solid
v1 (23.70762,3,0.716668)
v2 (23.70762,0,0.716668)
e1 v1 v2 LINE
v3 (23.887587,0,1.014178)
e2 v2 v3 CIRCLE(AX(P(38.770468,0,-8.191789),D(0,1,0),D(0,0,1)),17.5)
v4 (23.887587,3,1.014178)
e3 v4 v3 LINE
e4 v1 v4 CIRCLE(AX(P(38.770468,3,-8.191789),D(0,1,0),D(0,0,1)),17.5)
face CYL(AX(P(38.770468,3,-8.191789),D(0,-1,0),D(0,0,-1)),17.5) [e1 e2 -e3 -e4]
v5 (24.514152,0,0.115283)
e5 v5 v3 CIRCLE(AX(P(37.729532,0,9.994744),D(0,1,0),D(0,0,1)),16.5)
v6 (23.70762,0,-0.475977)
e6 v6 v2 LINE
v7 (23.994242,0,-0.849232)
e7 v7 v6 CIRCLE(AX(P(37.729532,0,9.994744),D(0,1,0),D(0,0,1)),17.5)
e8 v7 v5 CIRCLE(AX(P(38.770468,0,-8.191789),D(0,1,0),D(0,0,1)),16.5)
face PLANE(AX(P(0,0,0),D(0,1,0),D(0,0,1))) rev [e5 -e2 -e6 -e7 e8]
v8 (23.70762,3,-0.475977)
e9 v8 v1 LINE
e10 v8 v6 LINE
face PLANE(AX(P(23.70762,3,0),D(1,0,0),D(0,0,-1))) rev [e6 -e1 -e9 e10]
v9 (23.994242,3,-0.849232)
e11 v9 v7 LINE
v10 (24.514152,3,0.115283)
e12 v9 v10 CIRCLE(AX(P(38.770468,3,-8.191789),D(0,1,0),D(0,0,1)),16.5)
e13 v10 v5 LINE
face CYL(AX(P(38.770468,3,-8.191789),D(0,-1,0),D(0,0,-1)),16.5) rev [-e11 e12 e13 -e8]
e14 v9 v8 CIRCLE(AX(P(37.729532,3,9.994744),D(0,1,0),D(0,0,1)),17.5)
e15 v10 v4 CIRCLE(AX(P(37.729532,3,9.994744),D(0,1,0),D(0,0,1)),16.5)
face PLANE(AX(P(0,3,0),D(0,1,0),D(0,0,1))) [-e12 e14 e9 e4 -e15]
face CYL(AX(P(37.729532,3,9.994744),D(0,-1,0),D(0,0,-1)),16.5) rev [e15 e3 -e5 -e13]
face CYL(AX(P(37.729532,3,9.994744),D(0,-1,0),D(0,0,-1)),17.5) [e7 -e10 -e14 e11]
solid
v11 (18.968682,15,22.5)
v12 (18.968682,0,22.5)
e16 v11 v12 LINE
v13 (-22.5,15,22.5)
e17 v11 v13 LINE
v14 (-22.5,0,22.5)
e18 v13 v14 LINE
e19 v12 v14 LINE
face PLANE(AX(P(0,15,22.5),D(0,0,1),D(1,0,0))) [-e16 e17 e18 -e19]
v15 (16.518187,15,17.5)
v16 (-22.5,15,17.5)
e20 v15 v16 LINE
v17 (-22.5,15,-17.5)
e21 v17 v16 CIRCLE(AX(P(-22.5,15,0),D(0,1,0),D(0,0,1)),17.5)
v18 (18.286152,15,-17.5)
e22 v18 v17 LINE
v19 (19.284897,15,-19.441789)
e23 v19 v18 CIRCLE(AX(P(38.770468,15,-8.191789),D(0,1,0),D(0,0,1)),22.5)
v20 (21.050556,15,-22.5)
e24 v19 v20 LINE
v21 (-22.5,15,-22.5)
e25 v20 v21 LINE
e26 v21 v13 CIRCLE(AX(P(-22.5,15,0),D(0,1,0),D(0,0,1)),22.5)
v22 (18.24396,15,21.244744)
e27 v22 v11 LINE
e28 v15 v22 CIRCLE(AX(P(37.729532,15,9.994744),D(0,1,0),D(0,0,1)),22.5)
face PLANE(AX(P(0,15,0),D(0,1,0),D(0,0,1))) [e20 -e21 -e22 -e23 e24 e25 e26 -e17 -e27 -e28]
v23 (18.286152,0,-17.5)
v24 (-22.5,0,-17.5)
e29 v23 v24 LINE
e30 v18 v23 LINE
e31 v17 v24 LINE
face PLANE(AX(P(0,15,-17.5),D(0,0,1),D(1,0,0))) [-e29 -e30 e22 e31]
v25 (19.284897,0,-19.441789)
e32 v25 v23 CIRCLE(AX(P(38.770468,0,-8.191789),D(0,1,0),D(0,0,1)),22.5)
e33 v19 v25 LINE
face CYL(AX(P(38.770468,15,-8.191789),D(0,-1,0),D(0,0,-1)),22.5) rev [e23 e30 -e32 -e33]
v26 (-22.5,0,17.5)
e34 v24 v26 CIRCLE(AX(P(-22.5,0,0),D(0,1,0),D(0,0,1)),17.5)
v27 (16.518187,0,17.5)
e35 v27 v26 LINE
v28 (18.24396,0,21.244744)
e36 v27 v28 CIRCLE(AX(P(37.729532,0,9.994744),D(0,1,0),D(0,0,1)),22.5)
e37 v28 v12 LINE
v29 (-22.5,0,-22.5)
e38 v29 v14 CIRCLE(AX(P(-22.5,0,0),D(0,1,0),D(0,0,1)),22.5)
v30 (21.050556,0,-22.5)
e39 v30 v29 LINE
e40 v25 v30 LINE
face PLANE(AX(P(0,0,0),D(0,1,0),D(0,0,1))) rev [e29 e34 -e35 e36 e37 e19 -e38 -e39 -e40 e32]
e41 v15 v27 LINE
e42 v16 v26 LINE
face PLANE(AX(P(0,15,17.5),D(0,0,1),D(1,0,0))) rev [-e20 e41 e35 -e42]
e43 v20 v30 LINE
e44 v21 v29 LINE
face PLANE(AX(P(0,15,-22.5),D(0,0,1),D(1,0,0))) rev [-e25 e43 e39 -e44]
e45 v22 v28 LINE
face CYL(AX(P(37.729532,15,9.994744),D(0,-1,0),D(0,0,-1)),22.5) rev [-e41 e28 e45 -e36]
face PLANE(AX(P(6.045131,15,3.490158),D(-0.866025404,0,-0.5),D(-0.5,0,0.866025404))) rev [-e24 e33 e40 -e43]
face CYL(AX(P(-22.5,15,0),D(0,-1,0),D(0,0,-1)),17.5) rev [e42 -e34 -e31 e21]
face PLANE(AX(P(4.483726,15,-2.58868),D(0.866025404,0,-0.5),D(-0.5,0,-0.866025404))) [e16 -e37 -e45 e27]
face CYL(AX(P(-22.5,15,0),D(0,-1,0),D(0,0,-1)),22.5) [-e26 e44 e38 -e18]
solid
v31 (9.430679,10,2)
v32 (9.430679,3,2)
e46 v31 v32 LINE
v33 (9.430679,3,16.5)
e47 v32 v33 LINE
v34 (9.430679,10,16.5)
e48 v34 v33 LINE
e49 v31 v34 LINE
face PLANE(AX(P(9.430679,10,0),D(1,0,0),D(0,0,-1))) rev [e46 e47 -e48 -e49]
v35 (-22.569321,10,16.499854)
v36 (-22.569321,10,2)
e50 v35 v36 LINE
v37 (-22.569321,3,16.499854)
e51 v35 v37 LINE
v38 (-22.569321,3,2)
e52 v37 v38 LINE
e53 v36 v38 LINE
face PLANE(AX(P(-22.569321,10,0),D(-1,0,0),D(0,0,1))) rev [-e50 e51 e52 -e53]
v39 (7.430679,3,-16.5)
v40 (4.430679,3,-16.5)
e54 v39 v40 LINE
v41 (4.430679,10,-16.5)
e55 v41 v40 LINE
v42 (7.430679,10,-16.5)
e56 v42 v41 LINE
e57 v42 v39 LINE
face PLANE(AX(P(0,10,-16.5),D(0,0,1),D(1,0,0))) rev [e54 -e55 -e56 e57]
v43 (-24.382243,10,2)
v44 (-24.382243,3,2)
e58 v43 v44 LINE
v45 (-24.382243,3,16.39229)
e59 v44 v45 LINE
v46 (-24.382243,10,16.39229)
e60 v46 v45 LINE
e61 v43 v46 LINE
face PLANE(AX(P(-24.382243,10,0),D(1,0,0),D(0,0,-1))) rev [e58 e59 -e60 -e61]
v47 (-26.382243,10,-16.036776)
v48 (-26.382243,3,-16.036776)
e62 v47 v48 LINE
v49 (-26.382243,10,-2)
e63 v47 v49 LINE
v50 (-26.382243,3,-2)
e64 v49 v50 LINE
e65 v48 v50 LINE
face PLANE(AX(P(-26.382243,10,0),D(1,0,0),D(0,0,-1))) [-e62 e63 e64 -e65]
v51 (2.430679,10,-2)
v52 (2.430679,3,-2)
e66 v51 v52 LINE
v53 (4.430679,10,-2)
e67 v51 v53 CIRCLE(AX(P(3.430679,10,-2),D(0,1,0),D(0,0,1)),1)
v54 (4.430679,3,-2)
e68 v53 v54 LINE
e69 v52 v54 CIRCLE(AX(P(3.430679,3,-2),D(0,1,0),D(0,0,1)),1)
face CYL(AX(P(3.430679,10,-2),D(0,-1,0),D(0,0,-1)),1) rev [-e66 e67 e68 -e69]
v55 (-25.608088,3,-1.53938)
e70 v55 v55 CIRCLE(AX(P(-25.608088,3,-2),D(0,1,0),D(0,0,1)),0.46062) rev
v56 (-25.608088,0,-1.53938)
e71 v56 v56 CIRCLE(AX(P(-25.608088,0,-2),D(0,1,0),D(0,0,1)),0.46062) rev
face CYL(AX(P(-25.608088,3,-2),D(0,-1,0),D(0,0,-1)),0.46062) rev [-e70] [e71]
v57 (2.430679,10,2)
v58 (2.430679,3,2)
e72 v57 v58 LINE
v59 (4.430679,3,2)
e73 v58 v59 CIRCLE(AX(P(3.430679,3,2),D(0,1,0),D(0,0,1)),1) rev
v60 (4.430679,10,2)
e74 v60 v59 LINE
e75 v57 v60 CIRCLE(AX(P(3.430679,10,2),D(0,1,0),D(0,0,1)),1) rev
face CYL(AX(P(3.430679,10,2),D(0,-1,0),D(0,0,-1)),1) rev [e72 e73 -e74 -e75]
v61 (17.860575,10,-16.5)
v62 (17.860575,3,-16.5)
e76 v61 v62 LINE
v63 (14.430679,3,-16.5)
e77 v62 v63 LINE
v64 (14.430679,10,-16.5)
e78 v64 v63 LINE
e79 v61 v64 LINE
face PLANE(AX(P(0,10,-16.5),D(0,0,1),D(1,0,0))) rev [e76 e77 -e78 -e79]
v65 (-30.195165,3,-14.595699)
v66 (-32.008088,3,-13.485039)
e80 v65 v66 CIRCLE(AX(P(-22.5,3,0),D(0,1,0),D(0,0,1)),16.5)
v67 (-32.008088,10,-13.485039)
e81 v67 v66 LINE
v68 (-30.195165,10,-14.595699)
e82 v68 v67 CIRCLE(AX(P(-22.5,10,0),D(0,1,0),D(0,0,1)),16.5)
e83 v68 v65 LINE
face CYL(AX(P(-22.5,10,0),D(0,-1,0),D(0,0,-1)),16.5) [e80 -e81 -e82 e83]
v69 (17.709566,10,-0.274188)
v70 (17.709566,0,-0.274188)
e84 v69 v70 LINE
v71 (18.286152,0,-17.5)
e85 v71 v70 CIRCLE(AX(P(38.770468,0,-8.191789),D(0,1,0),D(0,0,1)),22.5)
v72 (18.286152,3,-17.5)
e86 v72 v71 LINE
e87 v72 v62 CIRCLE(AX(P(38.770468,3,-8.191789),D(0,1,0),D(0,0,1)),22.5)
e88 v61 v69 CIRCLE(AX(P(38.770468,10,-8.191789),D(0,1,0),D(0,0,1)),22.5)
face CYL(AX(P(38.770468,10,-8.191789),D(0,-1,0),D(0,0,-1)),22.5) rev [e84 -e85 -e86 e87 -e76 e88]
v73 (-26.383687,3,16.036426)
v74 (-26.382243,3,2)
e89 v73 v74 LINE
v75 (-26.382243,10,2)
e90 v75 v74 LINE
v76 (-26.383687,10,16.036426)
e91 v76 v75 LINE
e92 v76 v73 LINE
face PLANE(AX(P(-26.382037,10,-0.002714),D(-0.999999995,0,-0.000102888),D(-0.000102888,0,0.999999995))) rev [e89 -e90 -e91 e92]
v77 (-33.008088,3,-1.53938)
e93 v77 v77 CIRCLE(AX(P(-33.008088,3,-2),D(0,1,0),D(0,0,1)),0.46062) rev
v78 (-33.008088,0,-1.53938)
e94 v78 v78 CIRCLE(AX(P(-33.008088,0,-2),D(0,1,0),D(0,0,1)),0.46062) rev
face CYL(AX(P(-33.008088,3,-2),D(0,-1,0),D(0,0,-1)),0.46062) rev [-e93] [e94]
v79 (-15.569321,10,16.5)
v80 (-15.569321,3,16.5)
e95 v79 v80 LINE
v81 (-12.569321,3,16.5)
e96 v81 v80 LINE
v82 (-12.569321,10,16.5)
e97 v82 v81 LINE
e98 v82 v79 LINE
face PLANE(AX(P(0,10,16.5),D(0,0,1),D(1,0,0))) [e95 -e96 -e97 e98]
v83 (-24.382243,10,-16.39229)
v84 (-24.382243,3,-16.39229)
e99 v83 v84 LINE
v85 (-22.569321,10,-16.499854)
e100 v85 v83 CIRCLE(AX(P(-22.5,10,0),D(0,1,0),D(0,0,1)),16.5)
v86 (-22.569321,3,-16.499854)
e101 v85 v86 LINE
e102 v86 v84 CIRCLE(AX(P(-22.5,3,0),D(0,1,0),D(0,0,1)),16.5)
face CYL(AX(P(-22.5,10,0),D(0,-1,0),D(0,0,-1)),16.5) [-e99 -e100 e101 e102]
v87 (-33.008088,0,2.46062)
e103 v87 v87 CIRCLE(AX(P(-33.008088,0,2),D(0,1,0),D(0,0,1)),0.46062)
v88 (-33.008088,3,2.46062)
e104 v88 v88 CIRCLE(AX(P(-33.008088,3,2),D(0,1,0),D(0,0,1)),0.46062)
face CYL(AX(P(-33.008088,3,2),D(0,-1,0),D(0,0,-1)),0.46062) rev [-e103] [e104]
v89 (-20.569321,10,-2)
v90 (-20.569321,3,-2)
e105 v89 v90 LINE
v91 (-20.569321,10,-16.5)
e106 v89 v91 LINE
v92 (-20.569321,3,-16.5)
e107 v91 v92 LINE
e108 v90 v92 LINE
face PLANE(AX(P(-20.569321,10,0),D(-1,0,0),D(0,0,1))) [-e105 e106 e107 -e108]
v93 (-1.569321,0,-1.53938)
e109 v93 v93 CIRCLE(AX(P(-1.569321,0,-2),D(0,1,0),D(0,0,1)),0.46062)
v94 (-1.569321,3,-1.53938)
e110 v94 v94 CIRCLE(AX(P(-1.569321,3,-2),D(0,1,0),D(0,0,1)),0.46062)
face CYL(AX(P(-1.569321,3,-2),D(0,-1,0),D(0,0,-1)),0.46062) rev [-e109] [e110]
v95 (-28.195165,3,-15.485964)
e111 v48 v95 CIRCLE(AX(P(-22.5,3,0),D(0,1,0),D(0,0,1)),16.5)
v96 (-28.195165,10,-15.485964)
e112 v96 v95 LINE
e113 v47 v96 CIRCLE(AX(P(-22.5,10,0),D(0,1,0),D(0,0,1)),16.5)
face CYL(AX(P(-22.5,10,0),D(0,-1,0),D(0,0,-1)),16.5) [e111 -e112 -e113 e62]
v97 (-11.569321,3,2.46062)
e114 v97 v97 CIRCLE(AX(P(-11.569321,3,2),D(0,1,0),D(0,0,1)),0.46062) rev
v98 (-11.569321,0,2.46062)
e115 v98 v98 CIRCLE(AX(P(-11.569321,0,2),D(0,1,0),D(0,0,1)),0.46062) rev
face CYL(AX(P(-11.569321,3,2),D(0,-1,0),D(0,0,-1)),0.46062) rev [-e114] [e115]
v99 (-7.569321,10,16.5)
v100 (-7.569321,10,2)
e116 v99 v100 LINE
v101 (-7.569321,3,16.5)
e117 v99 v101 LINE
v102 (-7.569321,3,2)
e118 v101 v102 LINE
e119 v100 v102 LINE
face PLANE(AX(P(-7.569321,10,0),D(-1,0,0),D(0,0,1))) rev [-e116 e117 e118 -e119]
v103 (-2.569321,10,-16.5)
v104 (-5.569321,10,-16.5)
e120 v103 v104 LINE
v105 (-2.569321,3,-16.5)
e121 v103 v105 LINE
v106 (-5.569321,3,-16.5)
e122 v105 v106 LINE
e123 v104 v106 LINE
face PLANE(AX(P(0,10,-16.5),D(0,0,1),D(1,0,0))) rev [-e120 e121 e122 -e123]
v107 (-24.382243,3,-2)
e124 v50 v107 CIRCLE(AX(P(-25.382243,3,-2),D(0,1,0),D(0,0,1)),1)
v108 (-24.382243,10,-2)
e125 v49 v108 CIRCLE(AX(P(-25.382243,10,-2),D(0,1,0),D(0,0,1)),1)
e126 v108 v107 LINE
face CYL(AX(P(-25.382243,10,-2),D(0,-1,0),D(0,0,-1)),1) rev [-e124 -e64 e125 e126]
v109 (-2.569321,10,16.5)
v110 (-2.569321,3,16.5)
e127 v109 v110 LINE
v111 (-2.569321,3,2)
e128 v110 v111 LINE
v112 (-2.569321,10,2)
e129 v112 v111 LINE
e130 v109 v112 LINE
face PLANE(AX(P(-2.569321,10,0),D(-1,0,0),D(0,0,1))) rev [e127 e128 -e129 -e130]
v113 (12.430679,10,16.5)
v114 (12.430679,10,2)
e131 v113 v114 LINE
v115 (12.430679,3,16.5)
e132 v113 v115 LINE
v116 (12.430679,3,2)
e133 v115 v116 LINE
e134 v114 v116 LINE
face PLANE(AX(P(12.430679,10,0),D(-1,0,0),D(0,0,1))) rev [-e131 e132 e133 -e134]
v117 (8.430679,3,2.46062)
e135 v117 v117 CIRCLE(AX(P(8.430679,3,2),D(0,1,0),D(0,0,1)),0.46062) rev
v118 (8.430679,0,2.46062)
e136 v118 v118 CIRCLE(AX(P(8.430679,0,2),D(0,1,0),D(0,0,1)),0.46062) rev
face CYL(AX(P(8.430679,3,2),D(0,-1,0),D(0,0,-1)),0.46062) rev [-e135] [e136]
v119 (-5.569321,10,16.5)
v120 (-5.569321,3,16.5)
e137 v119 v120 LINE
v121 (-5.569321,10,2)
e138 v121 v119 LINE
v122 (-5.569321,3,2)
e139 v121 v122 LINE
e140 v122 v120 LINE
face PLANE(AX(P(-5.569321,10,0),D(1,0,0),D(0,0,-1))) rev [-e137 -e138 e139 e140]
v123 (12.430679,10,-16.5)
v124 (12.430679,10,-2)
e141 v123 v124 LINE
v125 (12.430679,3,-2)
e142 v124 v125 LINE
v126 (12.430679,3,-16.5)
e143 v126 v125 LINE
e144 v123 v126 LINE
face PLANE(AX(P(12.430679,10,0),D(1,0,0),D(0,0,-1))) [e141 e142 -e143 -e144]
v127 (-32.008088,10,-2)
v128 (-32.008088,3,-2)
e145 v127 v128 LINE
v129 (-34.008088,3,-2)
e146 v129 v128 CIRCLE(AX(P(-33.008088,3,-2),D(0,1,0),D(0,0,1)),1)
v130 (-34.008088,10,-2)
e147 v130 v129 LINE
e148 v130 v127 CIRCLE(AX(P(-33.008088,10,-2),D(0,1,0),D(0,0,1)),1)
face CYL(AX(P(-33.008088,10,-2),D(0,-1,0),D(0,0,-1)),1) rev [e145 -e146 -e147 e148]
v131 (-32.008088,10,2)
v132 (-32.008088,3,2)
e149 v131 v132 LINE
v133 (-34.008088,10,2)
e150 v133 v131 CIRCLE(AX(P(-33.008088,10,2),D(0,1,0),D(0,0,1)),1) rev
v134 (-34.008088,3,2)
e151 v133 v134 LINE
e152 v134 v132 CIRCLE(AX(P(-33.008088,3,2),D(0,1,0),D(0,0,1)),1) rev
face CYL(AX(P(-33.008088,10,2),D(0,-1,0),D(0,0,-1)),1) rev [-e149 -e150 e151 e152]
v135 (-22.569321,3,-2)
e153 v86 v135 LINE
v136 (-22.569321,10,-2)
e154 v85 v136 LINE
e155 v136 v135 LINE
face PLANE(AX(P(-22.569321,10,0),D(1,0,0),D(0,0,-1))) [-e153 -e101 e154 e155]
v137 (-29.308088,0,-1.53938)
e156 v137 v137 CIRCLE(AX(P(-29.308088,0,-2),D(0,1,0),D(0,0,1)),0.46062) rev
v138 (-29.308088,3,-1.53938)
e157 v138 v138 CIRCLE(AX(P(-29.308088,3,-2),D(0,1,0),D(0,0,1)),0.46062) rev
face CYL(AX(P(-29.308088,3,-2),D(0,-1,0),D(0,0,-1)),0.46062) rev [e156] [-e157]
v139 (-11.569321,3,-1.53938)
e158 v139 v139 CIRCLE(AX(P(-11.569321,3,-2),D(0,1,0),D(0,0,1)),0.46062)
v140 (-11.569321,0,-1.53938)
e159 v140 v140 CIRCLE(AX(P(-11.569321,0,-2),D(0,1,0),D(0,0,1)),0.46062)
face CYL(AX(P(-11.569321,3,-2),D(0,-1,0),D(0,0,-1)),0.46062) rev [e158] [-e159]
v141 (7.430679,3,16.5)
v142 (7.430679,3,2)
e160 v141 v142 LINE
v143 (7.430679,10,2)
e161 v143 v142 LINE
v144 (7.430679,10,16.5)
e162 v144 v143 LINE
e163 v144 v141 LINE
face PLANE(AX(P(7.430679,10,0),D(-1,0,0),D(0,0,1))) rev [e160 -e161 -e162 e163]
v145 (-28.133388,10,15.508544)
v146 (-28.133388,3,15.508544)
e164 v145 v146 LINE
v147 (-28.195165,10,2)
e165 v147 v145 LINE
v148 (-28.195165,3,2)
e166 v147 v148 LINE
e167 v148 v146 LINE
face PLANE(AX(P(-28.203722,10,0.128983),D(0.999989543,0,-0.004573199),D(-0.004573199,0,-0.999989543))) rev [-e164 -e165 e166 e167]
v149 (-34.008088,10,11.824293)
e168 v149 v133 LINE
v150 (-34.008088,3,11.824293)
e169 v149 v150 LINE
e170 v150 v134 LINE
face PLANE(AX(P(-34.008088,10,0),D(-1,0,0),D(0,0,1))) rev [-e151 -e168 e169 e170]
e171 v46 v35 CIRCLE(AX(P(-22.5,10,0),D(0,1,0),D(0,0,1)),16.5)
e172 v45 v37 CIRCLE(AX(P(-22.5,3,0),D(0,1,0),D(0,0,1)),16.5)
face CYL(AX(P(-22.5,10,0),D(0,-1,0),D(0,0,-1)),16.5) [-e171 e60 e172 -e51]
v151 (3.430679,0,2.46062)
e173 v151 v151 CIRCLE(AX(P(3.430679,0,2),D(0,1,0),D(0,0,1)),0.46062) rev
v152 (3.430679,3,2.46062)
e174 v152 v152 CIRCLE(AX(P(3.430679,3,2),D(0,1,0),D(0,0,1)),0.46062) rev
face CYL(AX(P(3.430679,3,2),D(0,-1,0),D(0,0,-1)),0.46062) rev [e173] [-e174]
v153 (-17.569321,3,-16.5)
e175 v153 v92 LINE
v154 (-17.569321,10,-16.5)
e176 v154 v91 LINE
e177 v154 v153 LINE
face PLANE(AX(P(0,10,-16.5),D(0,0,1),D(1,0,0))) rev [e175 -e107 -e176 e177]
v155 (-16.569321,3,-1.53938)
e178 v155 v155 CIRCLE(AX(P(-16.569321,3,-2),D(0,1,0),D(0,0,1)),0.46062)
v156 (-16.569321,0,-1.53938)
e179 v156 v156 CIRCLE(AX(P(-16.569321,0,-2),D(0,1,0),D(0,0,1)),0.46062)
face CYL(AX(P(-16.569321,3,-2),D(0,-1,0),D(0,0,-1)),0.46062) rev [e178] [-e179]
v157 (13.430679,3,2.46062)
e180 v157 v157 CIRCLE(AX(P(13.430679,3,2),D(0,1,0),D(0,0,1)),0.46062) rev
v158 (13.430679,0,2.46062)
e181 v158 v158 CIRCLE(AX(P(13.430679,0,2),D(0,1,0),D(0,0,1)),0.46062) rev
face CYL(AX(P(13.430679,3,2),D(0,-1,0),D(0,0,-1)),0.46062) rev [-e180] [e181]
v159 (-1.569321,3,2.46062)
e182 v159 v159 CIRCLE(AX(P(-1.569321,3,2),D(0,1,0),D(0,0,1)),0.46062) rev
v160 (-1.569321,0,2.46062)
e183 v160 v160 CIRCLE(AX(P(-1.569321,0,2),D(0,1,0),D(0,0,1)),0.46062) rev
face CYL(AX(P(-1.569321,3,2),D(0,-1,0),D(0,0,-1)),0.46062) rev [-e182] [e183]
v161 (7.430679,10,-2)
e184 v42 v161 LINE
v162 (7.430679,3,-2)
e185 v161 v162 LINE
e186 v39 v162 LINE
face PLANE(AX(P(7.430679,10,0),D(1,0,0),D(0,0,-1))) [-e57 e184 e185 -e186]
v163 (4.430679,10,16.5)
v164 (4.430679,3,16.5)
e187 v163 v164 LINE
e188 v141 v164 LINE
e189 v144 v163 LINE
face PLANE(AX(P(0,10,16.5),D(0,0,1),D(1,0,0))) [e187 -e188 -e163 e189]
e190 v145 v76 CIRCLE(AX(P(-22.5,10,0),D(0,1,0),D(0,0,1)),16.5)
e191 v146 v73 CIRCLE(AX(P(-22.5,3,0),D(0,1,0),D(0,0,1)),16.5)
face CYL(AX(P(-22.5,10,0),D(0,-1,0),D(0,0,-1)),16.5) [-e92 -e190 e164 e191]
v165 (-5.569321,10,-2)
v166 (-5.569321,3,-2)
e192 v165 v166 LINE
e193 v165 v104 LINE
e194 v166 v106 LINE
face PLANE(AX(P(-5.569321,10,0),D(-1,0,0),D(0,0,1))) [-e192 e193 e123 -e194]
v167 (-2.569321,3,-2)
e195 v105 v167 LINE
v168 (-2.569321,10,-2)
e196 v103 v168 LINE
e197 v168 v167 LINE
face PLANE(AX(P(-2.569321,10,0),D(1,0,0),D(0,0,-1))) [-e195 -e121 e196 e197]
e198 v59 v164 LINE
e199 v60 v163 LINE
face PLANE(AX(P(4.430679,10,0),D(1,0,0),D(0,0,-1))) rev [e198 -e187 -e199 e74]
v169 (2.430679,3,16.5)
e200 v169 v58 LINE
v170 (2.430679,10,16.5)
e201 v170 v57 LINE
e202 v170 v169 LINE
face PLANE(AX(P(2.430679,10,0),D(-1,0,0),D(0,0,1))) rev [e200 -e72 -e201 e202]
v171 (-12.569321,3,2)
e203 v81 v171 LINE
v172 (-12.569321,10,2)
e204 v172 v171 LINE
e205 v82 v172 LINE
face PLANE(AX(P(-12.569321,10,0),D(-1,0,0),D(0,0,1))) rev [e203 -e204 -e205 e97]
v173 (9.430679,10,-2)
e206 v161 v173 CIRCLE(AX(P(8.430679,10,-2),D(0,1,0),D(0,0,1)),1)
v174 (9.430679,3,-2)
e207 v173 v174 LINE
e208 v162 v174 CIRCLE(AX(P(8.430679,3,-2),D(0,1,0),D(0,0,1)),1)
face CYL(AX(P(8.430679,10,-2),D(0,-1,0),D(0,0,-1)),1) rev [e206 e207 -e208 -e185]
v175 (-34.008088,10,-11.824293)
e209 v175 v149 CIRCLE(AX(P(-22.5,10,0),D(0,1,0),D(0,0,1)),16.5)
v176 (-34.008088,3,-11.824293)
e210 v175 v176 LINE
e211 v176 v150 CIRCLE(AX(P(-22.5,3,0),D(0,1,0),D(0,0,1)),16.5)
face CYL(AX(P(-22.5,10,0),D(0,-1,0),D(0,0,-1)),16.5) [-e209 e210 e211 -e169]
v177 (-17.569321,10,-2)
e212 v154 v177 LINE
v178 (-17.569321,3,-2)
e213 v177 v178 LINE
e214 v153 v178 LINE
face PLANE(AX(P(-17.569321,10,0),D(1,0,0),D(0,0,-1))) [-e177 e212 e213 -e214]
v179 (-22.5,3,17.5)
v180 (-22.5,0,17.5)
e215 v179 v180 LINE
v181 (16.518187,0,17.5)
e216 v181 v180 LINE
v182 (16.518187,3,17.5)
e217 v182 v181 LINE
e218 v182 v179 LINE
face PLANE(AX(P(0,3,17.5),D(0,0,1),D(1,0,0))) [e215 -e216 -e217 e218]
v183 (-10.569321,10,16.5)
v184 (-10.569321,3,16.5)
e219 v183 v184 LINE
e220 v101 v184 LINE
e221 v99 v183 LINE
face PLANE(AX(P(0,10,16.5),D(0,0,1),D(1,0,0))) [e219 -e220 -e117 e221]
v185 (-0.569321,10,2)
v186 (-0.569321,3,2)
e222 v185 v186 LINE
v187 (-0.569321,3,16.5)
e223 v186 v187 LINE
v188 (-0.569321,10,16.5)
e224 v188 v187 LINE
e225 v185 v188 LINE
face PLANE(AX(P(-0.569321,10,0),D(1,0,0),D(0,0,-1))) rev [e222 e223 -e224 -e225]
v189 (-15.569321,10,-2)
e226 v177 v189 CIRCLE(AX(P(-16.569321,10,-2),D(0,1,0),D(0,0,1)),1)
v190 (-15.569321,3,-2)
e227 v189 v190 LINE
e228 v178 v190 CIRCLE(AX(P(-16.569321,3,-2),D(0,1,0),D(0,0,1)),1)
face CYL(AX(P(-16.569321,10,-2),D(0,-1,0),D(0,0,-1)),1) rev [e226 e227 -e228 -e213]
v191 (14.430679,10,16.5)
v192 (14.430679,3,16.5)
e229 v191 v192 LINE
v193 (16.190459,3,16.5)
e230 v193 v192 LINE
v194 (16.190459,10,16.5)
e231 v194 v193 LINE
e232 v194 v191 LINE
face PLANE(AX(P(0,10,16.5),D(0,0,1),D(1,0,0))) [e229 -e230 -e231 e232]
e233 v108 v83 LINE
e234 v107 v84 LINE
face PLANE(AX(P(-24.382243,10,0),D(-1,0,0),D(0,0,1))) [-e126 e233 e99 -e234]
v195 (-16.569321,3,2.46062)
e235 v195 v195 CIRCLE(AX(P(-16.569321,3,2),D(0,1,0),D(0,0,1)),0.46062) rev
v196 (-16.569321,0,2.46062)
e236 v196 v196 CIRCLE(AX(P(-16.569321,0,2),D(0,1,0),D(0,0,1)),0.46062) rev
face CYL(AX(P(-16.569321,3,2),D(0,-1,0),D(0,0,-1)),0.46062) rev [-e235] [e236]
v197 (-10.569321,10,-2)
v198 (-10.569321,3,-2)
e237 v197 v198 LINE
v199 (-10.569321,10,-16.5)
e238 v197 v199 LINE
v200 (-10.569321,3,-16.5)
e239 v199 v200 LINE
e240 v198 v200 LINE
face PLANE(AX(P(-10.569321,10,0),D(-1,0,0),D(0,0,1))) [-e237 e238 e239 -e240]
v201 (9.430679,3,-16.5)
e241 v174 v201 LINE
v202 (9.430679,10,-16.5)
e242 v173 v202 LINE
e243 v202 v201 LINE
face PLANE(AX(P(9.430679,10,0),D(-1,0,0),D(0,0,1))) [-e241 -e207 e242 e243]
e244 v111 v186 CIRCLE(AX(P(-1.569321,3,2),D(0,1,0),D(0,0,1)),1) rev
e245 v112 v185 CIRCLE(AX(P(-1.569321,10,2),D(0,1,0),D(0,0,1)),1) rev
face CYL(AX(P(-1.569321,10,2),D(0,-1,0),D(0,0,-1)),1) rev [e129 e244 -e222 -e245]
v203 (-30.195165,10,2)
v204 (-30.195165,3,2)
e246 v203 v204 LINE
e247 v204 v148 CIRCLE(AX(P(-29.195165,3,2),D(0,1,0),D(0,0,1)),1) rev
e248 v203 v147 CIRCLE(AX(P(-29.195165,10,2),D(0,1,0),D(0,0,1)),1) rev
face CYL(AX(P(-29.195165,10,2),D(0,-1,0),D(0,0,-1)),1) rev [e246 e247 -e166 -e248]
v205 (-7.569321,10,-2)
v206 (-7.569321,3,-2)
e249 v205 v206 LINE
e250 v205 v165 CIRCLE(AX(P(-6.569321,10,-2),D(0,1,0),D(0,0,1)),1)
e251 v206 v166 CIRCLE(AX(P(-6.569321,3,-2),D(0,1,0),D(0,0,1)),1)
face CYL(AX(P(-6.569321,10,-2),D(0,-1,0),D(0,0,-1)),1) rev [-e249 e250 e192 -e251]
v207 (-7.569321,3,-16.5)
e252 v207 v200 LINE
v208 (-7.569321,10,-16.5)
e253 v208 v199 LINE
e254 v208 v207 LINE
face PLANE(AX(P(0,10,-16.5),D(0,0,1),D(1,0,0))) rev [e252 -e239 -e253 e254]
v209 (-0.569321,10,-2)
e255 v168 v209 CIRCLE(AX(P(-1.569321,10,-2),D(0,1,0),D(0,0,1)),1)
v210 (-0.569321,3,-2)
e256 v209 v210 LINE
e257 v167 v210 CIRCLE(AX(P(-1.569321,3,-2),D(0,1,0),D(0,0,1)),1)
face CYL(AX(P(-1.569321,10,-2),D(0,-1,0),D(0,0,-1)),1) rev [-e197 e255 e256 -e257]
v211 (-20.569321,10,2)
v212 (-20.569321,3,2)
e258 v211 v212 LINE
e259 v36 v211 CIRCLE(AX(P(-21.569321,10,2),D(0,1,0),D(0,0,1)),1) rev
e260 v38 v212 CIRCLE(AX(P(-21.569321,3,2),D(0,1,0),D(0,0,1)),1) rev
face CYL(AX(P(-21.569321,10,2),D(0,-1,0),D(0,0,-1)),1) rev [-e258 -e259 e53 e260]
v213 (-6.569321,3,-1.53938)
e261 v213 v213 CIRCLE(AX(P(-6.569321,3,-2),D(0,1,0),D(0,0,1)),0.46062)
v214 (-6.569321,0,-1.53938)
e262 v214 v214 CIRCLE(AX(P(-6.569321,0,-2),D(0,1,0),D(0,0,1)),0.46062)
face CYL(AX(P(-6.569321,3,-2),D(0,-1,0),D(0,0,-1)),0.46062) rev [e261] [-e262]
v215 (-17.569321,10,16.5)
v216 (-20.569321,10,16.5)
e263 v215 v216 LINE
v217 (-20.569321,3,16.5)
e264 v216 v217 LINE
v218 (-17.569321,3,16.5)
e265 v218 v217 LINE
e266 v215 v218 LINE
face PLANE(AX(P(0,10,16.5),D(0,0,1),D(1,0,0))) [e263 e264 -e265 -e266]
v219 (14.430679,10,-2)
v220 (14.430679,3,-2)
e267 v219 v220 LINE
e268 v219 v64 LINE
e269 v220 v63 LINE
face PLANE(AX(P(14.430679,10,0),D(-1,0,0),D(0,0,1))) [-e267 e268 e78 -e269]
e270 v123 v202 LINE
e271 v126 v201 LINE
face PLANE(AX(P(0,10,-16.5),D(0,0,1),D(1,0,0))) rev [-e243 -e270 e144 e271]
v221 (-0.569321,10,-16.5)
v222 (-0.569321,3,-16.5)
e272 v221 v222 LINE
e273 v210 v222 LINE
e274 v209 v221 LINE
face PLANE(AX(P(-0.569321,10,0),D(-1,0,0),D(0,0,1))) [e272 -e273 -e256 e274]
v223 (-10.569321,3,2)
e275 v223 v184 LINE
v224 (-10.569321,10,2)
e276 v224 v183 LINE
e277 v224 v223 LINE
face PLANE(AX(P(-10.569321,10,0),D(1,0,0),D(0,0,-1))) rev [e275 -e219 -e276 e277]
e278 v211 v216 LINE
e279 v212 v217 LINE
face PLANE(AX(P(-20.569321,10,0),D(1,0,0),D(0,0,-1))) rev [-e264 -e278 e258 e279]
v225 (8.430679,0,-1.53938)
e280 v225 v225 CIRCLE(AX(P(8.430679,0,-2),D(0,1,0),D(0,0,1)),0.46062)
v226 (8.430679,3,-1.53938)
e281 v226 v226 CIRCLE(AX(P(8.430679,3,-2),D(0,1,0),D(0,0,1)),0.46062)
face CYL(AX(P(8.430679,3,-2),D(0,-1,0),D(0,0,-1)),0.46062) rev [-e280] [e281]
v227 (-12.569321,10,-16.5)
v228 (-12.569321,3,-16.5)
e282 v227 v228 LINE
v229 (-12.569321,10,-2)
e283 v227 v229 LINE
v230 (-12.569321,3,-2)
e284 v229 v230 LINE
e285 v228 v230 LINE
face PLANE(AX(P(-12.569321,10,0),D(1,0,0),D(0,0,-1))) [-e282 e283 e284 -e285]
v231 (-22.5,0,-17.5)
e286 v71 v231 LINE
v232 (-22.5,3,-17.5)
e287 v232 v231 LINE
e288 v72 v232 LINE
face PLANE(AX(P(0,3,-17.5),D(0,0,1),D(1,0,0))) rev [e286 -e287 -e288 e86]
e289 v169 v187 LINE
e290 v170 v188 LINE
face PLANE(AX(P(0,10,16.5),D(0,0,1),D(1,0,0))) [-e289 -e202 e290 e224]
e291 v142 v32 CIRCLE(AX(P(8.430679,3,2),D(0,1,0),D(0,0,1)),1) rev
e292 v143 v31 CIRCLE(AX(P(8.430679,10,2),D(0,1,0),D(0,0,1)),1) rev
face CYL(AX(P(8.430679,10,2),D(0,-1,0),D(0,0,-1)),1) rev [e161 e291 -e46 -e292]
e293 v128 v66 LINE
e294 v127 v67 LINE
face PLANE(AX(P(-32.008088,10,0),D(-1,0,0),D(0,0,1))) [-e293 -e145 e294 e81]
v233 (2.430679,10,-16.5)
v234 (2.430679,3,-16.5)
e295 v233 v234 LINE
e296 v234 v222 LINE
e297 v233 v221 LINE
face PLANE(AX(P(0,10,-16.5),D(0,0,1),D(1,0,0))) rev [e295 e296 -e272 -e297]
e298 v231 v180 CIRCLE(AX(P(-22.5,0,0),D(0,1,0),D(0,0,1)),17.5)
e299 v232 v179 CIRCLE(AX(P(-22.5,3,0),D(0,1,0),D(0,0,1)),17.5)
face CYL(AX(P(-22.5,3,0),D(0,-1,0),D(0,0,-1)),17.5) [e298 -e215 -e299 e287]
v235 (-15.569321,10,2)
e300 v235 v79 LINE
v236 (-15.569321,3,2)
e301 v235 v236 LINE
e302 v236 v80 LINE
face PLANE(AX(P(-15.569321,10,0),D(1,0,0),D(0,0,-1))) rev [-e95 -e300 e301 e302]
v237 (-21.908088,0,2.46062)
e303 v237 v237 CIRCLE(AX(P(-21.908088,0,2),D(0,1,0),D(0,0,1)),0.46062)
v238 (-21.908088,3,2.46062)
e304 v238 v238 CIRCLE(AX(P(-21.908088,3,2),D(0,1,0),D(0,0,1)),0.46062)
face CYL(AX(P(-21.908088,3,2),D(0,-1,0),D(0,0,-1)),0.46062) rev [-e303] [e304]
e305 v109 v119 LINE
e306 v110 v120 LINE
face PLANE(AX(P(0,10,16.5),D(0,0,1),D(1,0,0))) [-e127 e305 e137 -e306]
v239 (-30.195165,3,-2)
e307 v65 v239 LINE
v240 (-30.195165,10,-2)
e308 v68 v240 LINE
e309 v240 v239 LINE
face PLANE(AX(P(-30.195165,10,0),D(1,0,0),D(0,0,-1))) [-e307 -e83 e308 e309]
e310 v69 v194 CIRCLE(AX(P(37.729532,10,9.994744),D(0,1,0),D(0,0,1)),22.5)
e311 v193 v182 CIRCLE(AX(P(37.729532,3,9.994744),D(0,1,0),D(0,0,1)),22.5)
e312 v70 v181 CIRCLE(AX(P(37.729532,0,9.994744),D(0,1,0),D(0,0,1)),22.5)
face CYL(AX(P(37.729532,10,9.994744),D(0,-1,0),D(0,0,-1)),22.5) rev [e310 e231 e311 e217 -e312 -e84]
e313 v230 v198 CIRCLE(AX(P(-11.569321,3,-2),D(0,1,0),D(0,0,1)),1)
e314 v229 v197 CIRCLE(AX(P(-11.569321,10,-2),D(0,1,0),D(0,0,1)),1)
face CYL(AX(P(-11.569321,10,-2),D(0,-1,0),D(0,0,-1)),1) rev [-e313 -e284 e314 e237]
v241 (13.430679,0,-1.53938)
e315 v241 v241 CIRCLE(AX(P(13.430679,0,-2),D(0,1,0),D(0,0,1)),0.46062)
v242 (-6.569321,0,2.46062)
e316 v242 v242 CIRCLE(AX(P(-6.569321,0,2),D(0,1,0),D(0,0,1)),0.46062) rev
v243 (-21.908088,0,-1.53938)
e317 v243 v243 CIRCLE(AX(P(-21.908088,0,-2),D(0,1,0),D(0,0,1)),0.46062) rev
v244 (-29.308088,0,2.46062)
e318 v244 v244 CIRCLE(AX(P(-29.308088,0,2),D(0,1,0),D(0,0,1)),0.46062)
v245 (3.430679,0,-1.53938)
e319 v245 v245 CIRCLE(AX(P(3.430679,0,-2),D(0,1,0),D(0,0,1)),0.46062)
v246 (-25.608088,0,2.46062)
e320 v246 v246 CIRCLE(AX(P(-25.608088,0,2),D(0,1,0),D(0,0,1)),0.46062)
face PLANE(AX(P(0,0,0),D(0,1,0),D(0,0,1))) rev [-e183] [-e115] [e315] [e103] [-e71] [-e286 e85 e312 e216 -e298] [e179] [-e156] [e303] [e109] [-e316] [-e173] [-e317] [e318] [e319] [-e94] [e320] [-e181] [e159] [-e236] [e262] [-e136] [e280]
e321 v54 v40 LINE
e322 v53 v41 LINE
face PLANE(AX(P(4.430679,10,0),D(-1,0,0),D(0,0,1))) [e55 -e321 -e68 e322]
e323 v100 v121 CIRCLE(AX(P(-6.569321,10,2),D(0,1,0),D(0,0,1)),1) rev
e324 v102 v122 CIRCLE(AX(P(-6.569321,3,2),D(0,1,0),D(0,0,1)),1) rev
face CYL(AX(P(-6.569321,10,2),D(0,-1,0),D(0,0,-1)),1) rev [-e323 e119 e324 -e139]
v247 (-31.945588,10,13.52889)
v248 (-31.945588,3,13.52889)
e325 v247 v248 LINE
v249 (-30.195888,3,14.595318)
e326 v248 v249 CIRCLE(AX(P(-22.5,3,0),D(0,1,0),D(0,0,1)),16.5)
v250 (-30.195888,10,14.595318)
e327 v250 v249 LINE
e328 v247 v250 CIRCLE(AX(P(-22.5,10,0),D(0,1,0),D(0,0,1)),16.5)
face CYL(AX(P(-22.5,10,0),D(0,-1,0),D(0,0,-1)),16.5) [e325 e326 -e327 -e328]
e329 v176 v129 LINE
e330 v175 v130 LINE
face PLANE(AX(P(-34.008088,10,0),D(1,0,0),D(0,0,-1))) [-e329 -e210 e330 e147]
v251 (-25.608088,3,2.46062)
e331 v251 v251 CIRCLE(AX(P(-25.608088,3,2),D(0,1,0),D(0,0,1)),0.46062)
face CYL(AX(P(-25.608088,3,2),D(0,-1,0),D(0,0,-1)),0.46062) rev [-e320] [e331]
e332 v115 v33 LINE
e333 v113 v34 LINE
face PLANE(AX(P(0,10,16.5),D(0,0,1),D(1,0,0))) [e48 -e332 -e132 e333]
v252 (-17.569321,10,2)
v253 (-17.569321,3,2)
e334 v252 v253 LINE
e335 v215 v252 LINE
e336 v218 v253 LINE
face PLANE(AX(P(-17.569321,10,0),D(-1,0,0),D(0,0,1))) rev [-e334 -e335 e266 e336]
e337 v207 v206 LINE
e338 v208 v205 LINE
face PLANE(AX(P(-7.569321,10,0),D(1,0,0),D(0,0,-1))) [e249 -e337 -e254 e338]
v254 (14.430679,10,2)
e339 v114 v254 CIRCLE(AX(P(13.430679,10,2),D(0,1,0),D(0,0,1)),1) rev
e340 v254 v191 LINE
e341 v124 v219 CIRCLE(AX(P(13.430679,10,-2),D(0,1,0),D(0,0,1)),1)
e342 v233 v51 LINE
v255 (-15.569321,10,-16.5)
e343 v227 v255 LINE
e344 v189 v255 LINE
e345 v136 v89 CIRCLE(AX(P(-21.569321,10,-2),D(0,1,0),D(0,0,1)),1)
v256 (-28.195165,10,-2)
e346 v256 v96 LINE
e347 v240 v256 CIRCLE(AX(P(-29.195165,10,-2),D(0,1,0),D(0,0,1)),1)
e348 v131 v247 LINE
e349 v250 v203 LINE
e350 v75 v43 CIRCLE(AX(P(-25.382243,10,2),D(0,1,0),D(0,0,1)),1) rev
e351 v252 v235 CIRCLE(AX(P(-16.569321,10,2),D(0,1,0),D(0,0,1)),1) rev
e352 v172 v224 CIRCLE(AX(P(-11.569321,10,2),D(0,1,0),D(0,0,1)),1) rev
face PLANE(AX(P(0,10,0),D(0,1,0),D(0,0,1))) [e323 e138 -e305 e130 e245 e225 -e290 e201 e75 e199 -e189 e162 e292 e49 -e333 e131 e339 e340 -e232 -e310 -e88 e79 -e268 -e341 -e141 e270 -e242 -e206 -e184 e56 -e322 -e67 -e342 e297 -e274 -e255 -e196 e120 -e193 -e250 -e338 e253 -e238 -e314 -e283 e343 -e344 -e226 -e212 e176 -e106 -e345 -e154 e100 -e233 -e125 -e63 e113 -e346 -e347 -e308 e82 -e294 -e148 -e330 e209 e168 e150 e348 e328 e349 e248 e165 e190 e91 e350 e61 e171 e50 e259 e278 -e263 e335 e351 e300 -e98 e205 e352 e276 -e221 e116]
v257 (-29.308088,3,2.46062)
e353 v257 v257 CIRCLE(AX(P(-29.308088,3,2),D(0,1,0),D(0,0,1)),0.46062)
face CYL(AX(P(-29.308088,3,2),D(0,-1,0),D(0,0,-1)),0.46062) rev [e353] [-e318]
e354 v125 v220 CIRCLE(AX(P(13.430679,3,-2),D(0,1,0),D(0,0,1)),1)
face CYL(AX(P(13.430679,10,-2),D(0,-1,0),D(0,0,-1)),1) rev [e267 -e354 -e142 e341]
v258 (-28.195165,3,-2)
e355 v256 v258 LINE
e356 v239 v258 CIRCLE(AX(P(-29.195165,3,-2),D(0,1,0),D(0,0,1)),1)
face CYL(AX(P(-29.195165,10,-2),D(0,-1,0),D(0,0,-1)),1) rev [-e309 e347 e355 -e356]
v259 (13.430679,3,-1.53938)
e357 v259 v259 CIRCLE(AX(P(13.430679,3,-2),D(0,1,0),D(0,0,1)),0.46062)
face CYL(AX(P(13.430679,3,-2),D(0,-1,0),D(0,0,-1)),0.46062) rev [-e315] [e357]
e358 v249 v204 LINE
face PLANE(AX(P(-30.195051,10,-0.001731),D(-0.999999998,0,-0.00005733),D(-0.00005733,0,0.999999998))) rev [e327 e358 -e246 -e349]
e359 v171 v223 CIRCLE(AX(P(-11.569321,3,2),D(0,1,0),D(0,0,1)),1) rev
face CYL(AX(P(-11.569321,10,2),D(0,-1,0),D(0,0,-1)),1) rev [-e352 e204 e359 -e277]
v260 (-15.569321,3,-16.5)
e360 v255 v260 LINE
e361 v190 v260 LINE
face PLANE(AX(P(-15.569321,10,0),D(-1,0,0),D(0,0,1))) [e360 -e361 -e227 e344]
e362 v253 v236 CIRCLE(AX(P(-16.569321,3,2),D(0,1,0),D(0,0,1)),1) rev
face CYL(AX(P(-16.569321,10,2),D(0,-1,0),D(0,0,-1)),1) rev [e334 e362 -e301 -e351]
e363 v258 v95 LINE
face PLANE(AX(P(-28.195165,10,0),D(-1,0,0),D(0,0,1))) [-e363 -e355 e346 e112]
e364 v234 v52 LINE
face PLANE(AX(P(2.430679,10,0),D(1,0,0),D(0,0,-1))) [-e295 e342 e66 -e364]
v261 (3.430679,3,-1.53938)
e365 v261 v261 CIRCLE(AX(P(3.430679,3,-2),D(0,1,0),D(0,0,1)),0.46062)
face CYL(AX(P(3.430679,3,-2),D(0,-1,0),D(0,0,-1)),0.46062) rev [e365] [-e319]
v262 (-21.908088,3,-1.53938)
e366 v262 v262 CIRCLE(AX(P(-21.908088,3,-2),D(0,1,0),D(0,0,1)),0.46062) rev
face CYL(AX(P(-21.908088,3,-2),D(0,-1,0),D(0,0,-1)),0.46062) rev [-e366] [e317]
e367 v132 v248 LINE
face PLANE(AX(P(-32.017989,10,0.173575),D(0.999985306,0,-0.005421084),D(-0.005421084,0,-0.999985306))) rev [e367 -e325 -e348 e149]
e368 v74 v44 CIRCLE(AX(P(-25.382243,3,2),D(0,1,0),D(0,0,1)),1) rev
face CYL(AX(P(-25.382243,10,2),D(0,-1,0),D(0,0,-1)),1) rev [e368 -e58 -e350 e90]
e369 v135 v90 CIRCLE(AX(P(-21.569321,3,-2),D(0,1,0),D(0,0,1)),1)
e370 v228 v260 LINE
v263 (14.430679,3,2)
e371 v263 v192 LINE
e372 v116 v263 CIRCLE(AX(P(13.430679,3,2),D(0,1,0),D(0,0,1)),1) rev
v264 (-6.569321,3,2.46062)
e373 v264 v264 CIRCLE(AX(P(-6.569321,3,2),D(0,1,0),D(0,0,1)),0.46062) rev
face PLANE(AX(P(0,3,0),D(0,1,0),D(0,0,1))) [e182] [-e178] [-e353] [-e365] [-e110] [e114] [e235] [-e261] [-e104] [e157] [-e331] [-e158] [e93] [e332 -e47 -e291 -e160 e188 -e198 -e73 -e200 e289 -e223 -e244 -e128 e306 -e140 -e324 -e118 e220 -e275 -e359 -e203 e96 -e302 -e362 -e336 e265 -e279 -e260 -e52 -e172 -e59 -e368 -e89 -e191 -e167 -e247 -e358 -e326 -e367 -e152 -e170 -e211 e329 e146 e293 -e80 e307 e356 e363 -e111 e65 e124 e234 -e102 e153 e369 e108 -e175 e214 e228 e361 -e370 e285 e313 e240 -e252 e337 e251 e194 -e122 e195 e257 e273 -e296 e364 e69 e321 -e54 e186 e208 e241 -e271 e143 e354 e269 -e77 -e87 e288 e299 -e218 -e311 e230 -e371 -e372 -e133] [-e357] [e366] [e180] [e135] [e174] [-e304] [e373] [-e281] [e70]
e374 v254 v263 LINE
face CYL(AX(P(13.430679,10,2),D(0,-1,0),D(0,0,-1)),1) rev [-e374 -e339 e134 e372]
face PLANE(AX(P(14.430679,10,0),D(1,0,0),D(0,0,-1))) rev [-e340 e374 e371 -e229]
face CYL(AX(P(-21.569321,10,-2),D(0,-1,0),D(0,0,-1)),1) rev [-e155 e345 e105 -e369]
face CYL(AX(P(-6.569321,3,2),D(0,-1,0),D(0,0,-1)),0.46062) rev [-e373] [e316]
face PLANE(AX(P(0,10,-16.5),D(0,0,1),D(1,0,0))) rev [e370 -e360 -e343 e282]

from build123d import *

# Parameters (mm, degrees)
BOSS_EXTRUDE1_DEPTH     = 10
BOSS_EXTRUDE2_DEPTH     = 15
BOSS_EXTRUDE3_OUTLINE_R = 0.460619733
BOSS_EXTRUDE3_DEPTH     = 3


# Read off the part's stored shape, not the designer's step: Boss-Extrude3
with BuildPart() as part:
    # Sketch1 → Boss-Extrude1 (new body)
    with BuildSketch(Plane(origin=(0, 0, 0), x_dir=(1, 0, 0), z_dir=(0, 1, 0))):
        with BuildLine():
            Line((14.43067924, -16.5), (16.190459123, -16.5))
            ThreePointArc((16.190459123, -16.5), (15.321234979, -7.965400111), (17.709566163, 0.274188473))
            ThreePointArc((17.709566163, 0.274188473), (16.271442646, 8.401181134), (17.860575095, 16.5))
            Line((17.860575095, 16.5), (14.43067924, 16.5))
            Line((14.43067924, 16.5), (14.43067924, 2))
            ThreePointArc((14.43067924, 2), (13.43067924, 1), (12.43067924, 2))
            Line((12.43067924, 2), (12.43067924, 16.5))
            Line((12.43067924, 16.5), (9.43067924, 16.5))
            Line((9.43067924, 16.5), (9.43067924, 2))
            ThreePointArc((9.43067924, 2), (8.43067924, 1), (7.43067924, 2))
            Line((7.43067924, 2), (7.43067924, 16.5))
            Line((7.43067924, 16.5), (4.43067924, 16.5))
            Line((4.43067924, 16.5), (4.43067924, 2))
            ThreePointArc((4.43067924, 2), (3.43067924, 1), (2.43067924, 2))
            Line((2.43067924, 2), (2.43067924, 16.5))
            Line((2.43067924, 16.5), (-0.56932076, 16.5))
            Line((-0.56932076, 16.5), (-0.56932076, 2))
            ThreePointArc((-0.56932076, 2), (-1.56932076, 1), (-2.56932076, 2))
            Line((-2.56932076, 2), (-2.56932076, 16.5))
            Line((-2.56932076, 16.5), (-5.56932076, 16.5))
            Line((-5.56932076, 16.5), (-5.56932076, 2))
            ThreePointArc((-5.56932076, 2), (-6.56932076, 1), (-7.56932076, 2))
            Line((-7.56932076, 2), (-7.56932076, 16.5))
            Line((-7.56932076, 16.5), (-10.56932076, 16.5))
            Line((-10.56932076, 16.5), (-10.56932076, 2))
            ThreePointArc((-10.56932076, 2), (-11.56932076, 1), (-12.56932076, 2))
            Line((-12.56932076, 2), (-12.56932076, 16.5))
            Line((-12.56932076, 16.5), (-15.56932076, 16.5))
            Line((-15.56932076, 16.5), (-15.56932076, 2))
            ThreePointArc((-15.56932076, 2), (-16.56932076, 1), (-17.56932076, 2))
            Line((-17.56932076, 2), (-17.56932076, 16.5))
            Line((-17.56932076, 16.5), (-20.56932076, 16.5))
            Line((-20.56932076, 16.5), (-20.56932076, 2))
            ThreePointArc((-20.56932076, 2), (-21.56932076, 1), (-22.56932076, 2))
            Line((-22.56932076, 2), (-22.56932076, 16.499854382))
            ThreePointArc((-22.56932076, 16.499854382), (-23.47726298, 16.47103388), (-24.382243117, 16.392289677))
            Line((-24.382243117, 16.392289677), (-24.382243117, 2))
            ThreePointArc((-24.382243117, 2), (-25.382243117, 1), (-26.382243117, 2))
            Line((-26.382243117, 2), (-26.382243117, 16.036776122))
            ThreePointArc((-26.382243117, 16.036776122), (-27.29661727, 15.787414695), (-28.195165473, 15.485964298))
            Line((-28.195165473, 15.485964298), (-28.195165473, 2))
            ThreePointArc((-28.195165473, 2), (-29.195165473, 1), (-30.195165473, 2))
            Line((-30.195165473, 2), (-30.195165473, 14.595698967))
            ThreePointArc((-30.195165473, 14.595698967), (-31.119534364, 14.069599402), (-32.008087829, 13.485038592))
            Line((-32.008087829, 13.485038592), (-32.008087829, 2))
            ThreePointArc((-32.008087829, 2), (-33.008087829, 1), (-34.008087829, 2))
            Line((-34.008087829, 2), (-34.008087829, 11.824293405))
            ThreePointArc((-34.008087829, 11.824293405), (-39, 0), (-34.008087829, -11.824293405))
            Line((-34.008087829, -11.824293405), (-34.008087829, -2))
            ThreePointArc((-34.008087829, -2), (-33.008087829, -1), (-32.008087829, -2))
            Line((-32.008087829, -2), (-31.945587829, -13.528890219))
            ThreePointArc((-31.945587829, -13.528890219), (-31.087308184, -14.089291613), (-30.195887564, -14.595318243))
            Line((-30.195887564, -14.595318243), (-30.195165473, -2))
            ThreePointArc((-30.195165473, -2), (-29.195165473, -1), (-28.195165473, -2))
            Line((-28.195165473, -2), (-28.133387564, -15.508544244))
            ThreePointArc((-28.133387564, -15.508544244), (-27.265851801, -15.796729301), (-26.383687299, -16.03642644))
            Line((-26.383687299, -16.03642644), (-26.382243117, -2))
            ThreePointArc((-26.382243117, -2), (-25.382243117, -1), (-24.382243117, -2))
            Line((-24.382243117, -2), (-24.382243117, -16.392289677))
            ThreePointArc((-24.382243117, -16.392289677), (-23.47726298, -16.47103388), (-22.56932076, -16.499854382))
            Line((-22.56932076, -16.499854382), (-22.56932076, -2))
            ThreePointArc((-22.56932076, -2), (-21.56932076, -1), (-20.56932076, -2))
            Line((-20.56932076, -2), (-20.56932076, -16.5))
            Line((-20.56932076, -16.5), (-17.56932076, -16.5))
            Line((-17.56932076, -16.5), (-17.56932076, -2))
            ThreePointArc((-17.56932076, -2), (-16.56932076, -1), (-15.56932076, -2))
            Line((-15.56932076, -2), (-15.56932076, -16.5))
            Line((-15.56932076, -16.5), (-12.56932076, -16.5))
            Line((-12.56932076, -16.5), (-12.56932076, -2))
            ThreePointArc((-12.56932076, -2), (-11.56932076, -1), (-10.56932076, -2))
            Line((-10.56932076, -2), (-10.56932076, -16.5))
            Line((-10.56932076, -16.5), (-7.56932076, -16.5))
            Line((-7.56932076, -16.5), (-7.56932076, -2))
            ThreePointArc((-7.56932076, -2), (-6.56932076, -1), (-5.56932076, -2))
            Line((-5.56932076, -2), (-5.56932076, -16.5))
            Line((-5.56932076, -16.5), (-2.56932076, -16.5))
            Line((-2.56932076, -16.5), (-2.56932076, -2))
            ThreePointArc((-2.56932076, -2), (-1.56932076, -1), (-0.56932076, -2))
            Line((-0.56932076, -2), (-0.56932076, -16.5))
            Line((-0.56932076, -16.5), (2.43067924, -16.5))
            Line((2.43067924, -16.5), (2.43067924, -2))
            ThreePointArc((2.43067924, -2), (3.43067924, -1), (4.43067924, -2))
            Line((4.43067924, -2), (4.43067924, -16.5))
            Line((4.43067924, -16.5), (7.43067924, -16.5))
            Line((7.43067924, -16.5), (7.43067924, -2))
            ThreePointArc((7.43067924, -2), (8.43067924, -1), (9.43067924, -2))
            Line((9.43067924, -2), (9.43067924, -16.5))
            Line((9.43067924, -16.5), (12.43067924, -16.5))
            Line((12.43067924, -16.5), (12.43067924, -2))
            ThreePointArc((12.43067924, -2), (13.43067924, -1), (14.43067924, -2))
            Line((14.43067924, -2), (14.43067924, -16.5))
        make_face()
    extrude(amount=BOSS_EXTRUDE1_DEPTH)

    # Boss-Extrude3 outline → Boss-Extrude3 (add)
    # profile 1 of 2: a face of its own
    with BuildSketch(Plane(origin=(0, 0, 0), x_dir=(1, 0, 0), z_dir=(0, 1, 0))):
        with BuildLine():
            ThreePointArc((23.707620362, -0.716668129), (23.796864688, -0.865870258), (23.887586858, -1.014178427))
            ThreePointArc((23.887586858, -1.014178427), (24.193405903, -0.559528413), (24.514152319, -0.115283368))
            ThreePointArc((24.514152319, -0.115283368), (24.24618875, 0.362657475), (23.99424227, 0.84923213))
            ThreePointArc((23.99424227, 0.84923213), (23.849676568, 0.663568045), (23.707620362, 0.475976923))
            Line((23.707620362, 0.475976923), (23.707620362, -0.716668129))
        make_face()
    # profile 2 of 2: a face of its own
    with BuildSketch(Plane(origin=(0, 0, 0), x_dir=(1, 0, 0), z_dir=(0, 1, 0))):
        with BuildLine():
            Line((18.286152049, 17.5), (-22.5, 17.5))
            ThreePointArc((-22.5, 17.5), (-40, 0), (-22.5, -17.5))
            Line((-22.5, -17.5), (16.518187187, -17.5))
            ThreePointArc((16.518187187, -17.5), (16.348476058, -17.001916258), (16.190459122, -16.5))
            Line((16.190459122, -16.5), (14.43067924, -16.5))
            Line((14.43067924, -16.5), (14.43067924, -2))
            ThreePointArc((14.43067924, -2), (13.43067924, -1), (12.43067924, -2))
            Line((12.43067924, -2), (12.43067924, -16.5))
            Line((12.43067924, -16.5), (9.43067924, -16.5))
            Line((9.43067924, -16.5), (9.43067924, -2))
            ThreePointArc((9.43067924, -2), (8.43067924, -1), (7.43067924, -2))
            Line((7.43067924, -2), (7.43067924, -16.5))
            Line((7.43067924, -16.5), (4.43067924, -16.5))
            Line((4.43067924, -16.5), (4.43067924, -2))
            ThreePointArc((4.43067924, -2), (3.43067924, -1), (2.43067924, -2))
            Line((2.43067924, -2), (2.43067924, -16.5))
            Line((2.43067924, -16.5), (-0.56932076, -16.5))
            Line((-0.56932076, -16.5), (-0.56932076, -2))
            ThreePointArc((-0.56932076, -2), (-1.56932076, -1), (-2.56932076, -2))
            Line((-2.56932076, -2), (-2.56932076, -16.5))
            Line((-2.56932076, -16.5), (-5.56932076, -16.5))
            Line((-5.56932076, -16.5), (-5.56932076, -2))
            ThreePointArc((-5.56932076, -2), (-6.56932076, -1), (-7.56932076, -2))
            Line((-7.56932076, -2), (-7.56932076, -16.5))
            Line((-7.56932076, -16.5), (-10.56932076, -16.5))
            Line((-10.56932076, -16.5), (-10.56932076, -2))
            ThreePointArc((-10.56932076, -2), (-11.56932076, -1), (-12.56932076, -2))
            Line((-12.56932076, -2), (-12.56932076, -16.5))
            Line((-12.56932076, -16.5), (-15.56932076, -16.5))
            Line((-15.56932076, -16.5), (-15.56932076, -2))
            ThreePointArc((-15.56932076, -2), (-16.56932076, -1), (-17.56932076, -2))
            Line((-17.56932076, -2), (-17.56932076, -16.5))
            Line((-17.56932076, -16.5), (-20.56932076, -16.5))
            Line((-20.56932076, -16.5), (-20.56932076, -2))
            ThreePointArc((-20.56932076, -2), (-21.56932076, -1), (-22.56932076, -2))
            Line((-22.56932076, -2), (-22.56932076, -16.499854382))
            ThreePointArc((-22.56932076, -16.499854382), (-23.47726298, -16.47103388), (-24.382243117, -16.392289677))
            Line((-24.382243117, -16.392289677), (-24.382243117, -2))
            ThreePointArc((-24.382243117, -2), (-25.382243117, -1), (-26.382243117, -2))
            Line((-26.382243117, -2), (-26.383687299, -16.03642644))
            ThreePointArc((-26.383687299, -16.03642644), (-27.265851801, -15.796729301), (-28.133387564, -15.508544244))
            Line((-28.133387564, -15.508544244), (-28.195165473, -2))
            ThreePointArc((-28.195165473, -2), (-29.195165473, -1), (-30.195165473, -2))
            Line((-30.195165473, -2), (-30.195887564, -14.595318243))
            ThreePointArc((-30.195887564, -14.595318243), (-31.087308184, -14.089291613), (-31.945587829, -13.528890219))
            Line((-31.945587829, -13.528890219), (-32.008087829, -2))
            ThreePointArc((-32.008087829, -2), (-33.008087829, -1), (-34.008087829, -2))
            Line((-34.008087829, -2), (-34.008087829, -11.824293405))
            ThreePointArc((-34.008087829, -11.824293405), (-39, 0), (-34.008087829, 11.824293405))
            Line((-34.008087829, 11.824293405), (-34.008087829, 2))
            ThreePointArc((-34.008087829, 2), (-33.008087829, 1), (-32.008087829, 2))
            Line((-32.008087829, 2), (-32.008087829, 13.485038592))
            ThreePointArc((-32.008087829, 13.485038592), (-31.119534364, 14.069599402), (-30.195165473, 14.595698967))
            Line((-30.195165473, 14.595698967), (-30.195165473, 2))
            ThreePointArc((-30.195165473, 2), (-29.195165473, 1), (-28.195165473, 2))
            Line((-28.195165473, 2), (-28.195165473, 15.485964298))
            ThreePointArc((-28.195165473, 15.485964298), (-27.296617271, 15.787414695), (-26.382243117, 16.036776122))
            Line((-26.382243117, 16.036776122), (-26.382243117, 2))
            ThreePointArc((-26.382243117, 2), (-25.382243117, 1), (-24.382243117, 2))
            Line((-24.382243117, 2), (-24.382243117, 16.392289677))
            ThreePointArc((-24.382243117, 16.392289677), (-23.47726298, 16.47103388), (-22.56932076, 16.499854382))
            Line((-22.56932076, 16.499854382), (-22.56932076, 2))
            ThreePointArc((-22.56932076, 2), (-21.56932076, 1), (-20.56932076, 2))
            Line((-20.56932076, 2), (-20.56932076, 16.5))
            Line((-20.56932076, 16.5), (-17.56932076, 16.5))
            Line((-17.56932076, 16.5), (-17.56932076, 2))
            ThreePointArc((-17.56932076, 2), (-16.56932076, 1), (-15.56932076, 2))
            Line((-15.56932076, 2), (-15.56932076, 16.5))
            Line((-15.56932076, 16.5), (-12.56932076, 16.5))
            Line((-12.56932076, 16.5), (-12.56932076, 2))
            ThreePointArc((-12.56932076, 2), (-11.56932076, 1), (-10.56932076, 2))
            Line((-10.56932076, 2), (-10.56932076, 16.5))
            Line((-10.56932076, 16.5), (-7.56932076, 16.5))
            Line((-7.56932076, 16.5), (-7.56932076, 2))
            ThreePointArc((-7.56932076, 2), (-6.56932076, 1), (-5.56932076, 2))
            Line((-5.56932076, 2), (-5.56932076, 16.5))
            Line((-5.56932076, 16.5), (-2.56932076, 16.5))
            Line((-2.56932076, 16.5), (-2.56932076, 2))
            ThreePointArc((-2.56932076, 2), (-1.56932076, 1), (-0.56932076, 2))
            Line((-0.56932076, 2), (-0.56932076, 16.5))
            Line((-0.56932076, 16.5), (2.43067924, 16.5))
            Line((2.43067924, 16.5), (2.43067924, 2))
            ThreePointArc((2.43067924, 2), (3.43067924, 1), (4.43067924, 2))
            Line((4.43067924, 2), (4.43067924, 16.5))
            Line((4.43067924, 16.5), (7.43067924, 16.5))
            Line((7.43067924, 16.5), (7.43067924, 2))
            ThreePointArc((7.43067924, 2), (8.43067924, 1), (9.43067924, 2))
            Line((9.43067924, 2), (9.43067924, 16.5))
            Line((9.43067924, 16.5), (12.43067924, 16.5))
            Line((12.43067924, 16.5), (12.43067924, 2))
            ThreePointArc((12.43067924, 2), (13.43067924, 1), (14.43067924, 2))
            Line((14.43067924, 2), (14.43067924, 16.5))
            Line((14.43067924, 16.5), (17.860575095, 16.5))
            ThreePointArc((17.860575095, 16.5), (18.067324961, 17.002569894), (18.286152049, 17.5))
        make_face()
        with Locations((-33.008087829, -2)):
            Circle(BOSS_EXTRUDE3_OUTLINE_R, mode=Mode.SUBTRACT)
        with Locations((-29.308087829, -2)):
            Circle(BOSS_EXTRUDE3_OUTLINE_R, mode=Mode.SUBTRACT)
        with Locations((-25.608087829, -2)):
            Circle(BOSS_EXTRUDE3_OUTLINE_R, mode=Mode.SUBTRACT)
        with Locations((-21.908087829, -2)):
            Circle(BOSS_EXTRUDE3_OUTLINE_R, mode=Mode.SUBTRACT)
        with Locations((-16.56932076, -2)):
            Circle(BOSS_EXTRUDE3_OUTLINE_R, mode=Mode.SUBTRACT)
        with Locations((-11.56932076, -2)):
            Circle(BOSS_EXTRUDE3_OUTLINE_R, mode=Mode.SUBTRACT)
        with Locations((-6.56932076, -2)):
            Circle(BOSS_EXTRUDE3_OUTLINE_R, mode=Mode.SUBTRACT)
        with Locations((-1.56932076, -2)):
            Circle(BOSS_EXTRUDE3_OUTLINE_R, mode=Mode.SUBTRACT)
        with Locations((3.43067924, -2)):
            Circle(BOSS_EXTRUDE3_OUTLINE_R, mode=Mode.SUBTRACT)
        with Locations((8.43067924, -2)):
            Circle(BOSS_EXTRUDE3_OUTLINE_R, mode=Mode.SUBTRACT)
        with Locations((13.43067924, -2)):
            Circle(BOSS_EXTRUDE3_OUTLINE_R, mode=Mode.SUBTRACT)
        with Locations((-33.008087829, 2)):
            Circle(BOSS_EXTRUDE3_OUTLINE_R, mode=Mode.SUBTRACT)
        with Locations((-29.308087829, 2)):
            Circle(BOSS_EXTRUDE3_OUTLINE_R, mode=Mode.SUBTRACT)
        with Locations((-25.608087829, 2)):
            Circle(BOSS_EXTRUDE3_OUTLINE_R, mode=Mode.SUBTRACT)
        with Locations((-21.908087829, 2)):
            Circle(BOSS_EXTRUDE3_OUTLINE_R, mode=Mode.SUBTRACT)
        with Locations((-16.56932076, 2)):
            Circle(BOSS_EXTRUDE3_OUTLINE_R, mode=Mode.SUBTRACT)
        with Locations((-11.56932076, 2)):
            Circle(BOSS_EXTRUDE3_OUTLINE_R, mode=Mode.SUBTRACT)
        with Locations((-6.56932076, 2)):
            Circle(BOSS_EXTRUDE3_OUTLINE_R, mode=Mode.SUBTRACT)
        with Locations((-1.56932076, 2)):
            Circle(BOSS_EXTRUDE3_OUTLINE_R, mode=Mode.SUBTRACT)
        with Locations((3.43067924, 2)):
            Circle(BOSS_EXTRUDE3_OUTLINE_R, mode=Mode.SUBTRACT)
        with Locations((8.43067924, 2)):
            Circle(BOSS_EXTRUDE3_OUTLINE_R, mode=Mode.SUBTRACT)
        with Locations((13.43067924, 2)):
            Circle(BOSS_EXTRUDE3_OUTLINE_R, mode=Mode.SUBTRACT)
    extrude(amount=BOSS_EXTRUDE3_DEPTH)


with BuildPart() as body_2:
    # Sketch1<4> → Boss-Extrude2 (new body)
    with BuildSketch(Plane(origin=(0, 0, 0), x_dir=(1, 0, 0), z_dir=(0, 1, 0))):
        with BuildLine():
            ThreePointArc((18.243960123, -21.244744266), (17.295111664, -19.41198789), (16.518187187, -17.5))
            Line((16.518187187, -17.5), (-22.5, -17.5))
            ThreePointArc((-22.5, -17.5), (-22.534660448, -17.499965676), (-22.56932076, -17.499862703))
            ThreePointArc((-22.56932076, -17.499862703), (-23.477097705, -17.472700995), (-24.382243117, -17.398481567))
            ThreePointArc((-24.382243117, -17.398481567), (-40, 0), (-24.382243117, 17.398481567))
            ThreePointArc((-24.382243117, 17.398481567), (-23.477097705, 17.472700995), (-22.56932076, 17.499862703))
            ThreePointArc((-22.56932076, 17.499862703), (-22.534660448, 17.499965676), (-22.5, 17.5))
            Line((-22.5, 17.5), (18.286152049, 17.5))
            ThreePointArc((18.286152049, 17.5), (18.761954614, 18.483017537), (19.284896707, 19.441789214))
            Line((19.284896707, 19.441789214), (21.050555528, 22.5))
            Line((21.050555528, 22.5), (-22.5, 22.5))
            ThreePointArc((-22.5, 22.5), (-45, 0), (-22.5, -22.5))
            Line((-22.5, -22.5), (18.968682359, -22.5))
            Line((18.968682359, -22.5), (18.243960123, -21.244744266))
        make_face()
    extrude(amount=BOSS_EXTRUDE2_DEPTH)


solid = Compound([part.part, body_2.part])
